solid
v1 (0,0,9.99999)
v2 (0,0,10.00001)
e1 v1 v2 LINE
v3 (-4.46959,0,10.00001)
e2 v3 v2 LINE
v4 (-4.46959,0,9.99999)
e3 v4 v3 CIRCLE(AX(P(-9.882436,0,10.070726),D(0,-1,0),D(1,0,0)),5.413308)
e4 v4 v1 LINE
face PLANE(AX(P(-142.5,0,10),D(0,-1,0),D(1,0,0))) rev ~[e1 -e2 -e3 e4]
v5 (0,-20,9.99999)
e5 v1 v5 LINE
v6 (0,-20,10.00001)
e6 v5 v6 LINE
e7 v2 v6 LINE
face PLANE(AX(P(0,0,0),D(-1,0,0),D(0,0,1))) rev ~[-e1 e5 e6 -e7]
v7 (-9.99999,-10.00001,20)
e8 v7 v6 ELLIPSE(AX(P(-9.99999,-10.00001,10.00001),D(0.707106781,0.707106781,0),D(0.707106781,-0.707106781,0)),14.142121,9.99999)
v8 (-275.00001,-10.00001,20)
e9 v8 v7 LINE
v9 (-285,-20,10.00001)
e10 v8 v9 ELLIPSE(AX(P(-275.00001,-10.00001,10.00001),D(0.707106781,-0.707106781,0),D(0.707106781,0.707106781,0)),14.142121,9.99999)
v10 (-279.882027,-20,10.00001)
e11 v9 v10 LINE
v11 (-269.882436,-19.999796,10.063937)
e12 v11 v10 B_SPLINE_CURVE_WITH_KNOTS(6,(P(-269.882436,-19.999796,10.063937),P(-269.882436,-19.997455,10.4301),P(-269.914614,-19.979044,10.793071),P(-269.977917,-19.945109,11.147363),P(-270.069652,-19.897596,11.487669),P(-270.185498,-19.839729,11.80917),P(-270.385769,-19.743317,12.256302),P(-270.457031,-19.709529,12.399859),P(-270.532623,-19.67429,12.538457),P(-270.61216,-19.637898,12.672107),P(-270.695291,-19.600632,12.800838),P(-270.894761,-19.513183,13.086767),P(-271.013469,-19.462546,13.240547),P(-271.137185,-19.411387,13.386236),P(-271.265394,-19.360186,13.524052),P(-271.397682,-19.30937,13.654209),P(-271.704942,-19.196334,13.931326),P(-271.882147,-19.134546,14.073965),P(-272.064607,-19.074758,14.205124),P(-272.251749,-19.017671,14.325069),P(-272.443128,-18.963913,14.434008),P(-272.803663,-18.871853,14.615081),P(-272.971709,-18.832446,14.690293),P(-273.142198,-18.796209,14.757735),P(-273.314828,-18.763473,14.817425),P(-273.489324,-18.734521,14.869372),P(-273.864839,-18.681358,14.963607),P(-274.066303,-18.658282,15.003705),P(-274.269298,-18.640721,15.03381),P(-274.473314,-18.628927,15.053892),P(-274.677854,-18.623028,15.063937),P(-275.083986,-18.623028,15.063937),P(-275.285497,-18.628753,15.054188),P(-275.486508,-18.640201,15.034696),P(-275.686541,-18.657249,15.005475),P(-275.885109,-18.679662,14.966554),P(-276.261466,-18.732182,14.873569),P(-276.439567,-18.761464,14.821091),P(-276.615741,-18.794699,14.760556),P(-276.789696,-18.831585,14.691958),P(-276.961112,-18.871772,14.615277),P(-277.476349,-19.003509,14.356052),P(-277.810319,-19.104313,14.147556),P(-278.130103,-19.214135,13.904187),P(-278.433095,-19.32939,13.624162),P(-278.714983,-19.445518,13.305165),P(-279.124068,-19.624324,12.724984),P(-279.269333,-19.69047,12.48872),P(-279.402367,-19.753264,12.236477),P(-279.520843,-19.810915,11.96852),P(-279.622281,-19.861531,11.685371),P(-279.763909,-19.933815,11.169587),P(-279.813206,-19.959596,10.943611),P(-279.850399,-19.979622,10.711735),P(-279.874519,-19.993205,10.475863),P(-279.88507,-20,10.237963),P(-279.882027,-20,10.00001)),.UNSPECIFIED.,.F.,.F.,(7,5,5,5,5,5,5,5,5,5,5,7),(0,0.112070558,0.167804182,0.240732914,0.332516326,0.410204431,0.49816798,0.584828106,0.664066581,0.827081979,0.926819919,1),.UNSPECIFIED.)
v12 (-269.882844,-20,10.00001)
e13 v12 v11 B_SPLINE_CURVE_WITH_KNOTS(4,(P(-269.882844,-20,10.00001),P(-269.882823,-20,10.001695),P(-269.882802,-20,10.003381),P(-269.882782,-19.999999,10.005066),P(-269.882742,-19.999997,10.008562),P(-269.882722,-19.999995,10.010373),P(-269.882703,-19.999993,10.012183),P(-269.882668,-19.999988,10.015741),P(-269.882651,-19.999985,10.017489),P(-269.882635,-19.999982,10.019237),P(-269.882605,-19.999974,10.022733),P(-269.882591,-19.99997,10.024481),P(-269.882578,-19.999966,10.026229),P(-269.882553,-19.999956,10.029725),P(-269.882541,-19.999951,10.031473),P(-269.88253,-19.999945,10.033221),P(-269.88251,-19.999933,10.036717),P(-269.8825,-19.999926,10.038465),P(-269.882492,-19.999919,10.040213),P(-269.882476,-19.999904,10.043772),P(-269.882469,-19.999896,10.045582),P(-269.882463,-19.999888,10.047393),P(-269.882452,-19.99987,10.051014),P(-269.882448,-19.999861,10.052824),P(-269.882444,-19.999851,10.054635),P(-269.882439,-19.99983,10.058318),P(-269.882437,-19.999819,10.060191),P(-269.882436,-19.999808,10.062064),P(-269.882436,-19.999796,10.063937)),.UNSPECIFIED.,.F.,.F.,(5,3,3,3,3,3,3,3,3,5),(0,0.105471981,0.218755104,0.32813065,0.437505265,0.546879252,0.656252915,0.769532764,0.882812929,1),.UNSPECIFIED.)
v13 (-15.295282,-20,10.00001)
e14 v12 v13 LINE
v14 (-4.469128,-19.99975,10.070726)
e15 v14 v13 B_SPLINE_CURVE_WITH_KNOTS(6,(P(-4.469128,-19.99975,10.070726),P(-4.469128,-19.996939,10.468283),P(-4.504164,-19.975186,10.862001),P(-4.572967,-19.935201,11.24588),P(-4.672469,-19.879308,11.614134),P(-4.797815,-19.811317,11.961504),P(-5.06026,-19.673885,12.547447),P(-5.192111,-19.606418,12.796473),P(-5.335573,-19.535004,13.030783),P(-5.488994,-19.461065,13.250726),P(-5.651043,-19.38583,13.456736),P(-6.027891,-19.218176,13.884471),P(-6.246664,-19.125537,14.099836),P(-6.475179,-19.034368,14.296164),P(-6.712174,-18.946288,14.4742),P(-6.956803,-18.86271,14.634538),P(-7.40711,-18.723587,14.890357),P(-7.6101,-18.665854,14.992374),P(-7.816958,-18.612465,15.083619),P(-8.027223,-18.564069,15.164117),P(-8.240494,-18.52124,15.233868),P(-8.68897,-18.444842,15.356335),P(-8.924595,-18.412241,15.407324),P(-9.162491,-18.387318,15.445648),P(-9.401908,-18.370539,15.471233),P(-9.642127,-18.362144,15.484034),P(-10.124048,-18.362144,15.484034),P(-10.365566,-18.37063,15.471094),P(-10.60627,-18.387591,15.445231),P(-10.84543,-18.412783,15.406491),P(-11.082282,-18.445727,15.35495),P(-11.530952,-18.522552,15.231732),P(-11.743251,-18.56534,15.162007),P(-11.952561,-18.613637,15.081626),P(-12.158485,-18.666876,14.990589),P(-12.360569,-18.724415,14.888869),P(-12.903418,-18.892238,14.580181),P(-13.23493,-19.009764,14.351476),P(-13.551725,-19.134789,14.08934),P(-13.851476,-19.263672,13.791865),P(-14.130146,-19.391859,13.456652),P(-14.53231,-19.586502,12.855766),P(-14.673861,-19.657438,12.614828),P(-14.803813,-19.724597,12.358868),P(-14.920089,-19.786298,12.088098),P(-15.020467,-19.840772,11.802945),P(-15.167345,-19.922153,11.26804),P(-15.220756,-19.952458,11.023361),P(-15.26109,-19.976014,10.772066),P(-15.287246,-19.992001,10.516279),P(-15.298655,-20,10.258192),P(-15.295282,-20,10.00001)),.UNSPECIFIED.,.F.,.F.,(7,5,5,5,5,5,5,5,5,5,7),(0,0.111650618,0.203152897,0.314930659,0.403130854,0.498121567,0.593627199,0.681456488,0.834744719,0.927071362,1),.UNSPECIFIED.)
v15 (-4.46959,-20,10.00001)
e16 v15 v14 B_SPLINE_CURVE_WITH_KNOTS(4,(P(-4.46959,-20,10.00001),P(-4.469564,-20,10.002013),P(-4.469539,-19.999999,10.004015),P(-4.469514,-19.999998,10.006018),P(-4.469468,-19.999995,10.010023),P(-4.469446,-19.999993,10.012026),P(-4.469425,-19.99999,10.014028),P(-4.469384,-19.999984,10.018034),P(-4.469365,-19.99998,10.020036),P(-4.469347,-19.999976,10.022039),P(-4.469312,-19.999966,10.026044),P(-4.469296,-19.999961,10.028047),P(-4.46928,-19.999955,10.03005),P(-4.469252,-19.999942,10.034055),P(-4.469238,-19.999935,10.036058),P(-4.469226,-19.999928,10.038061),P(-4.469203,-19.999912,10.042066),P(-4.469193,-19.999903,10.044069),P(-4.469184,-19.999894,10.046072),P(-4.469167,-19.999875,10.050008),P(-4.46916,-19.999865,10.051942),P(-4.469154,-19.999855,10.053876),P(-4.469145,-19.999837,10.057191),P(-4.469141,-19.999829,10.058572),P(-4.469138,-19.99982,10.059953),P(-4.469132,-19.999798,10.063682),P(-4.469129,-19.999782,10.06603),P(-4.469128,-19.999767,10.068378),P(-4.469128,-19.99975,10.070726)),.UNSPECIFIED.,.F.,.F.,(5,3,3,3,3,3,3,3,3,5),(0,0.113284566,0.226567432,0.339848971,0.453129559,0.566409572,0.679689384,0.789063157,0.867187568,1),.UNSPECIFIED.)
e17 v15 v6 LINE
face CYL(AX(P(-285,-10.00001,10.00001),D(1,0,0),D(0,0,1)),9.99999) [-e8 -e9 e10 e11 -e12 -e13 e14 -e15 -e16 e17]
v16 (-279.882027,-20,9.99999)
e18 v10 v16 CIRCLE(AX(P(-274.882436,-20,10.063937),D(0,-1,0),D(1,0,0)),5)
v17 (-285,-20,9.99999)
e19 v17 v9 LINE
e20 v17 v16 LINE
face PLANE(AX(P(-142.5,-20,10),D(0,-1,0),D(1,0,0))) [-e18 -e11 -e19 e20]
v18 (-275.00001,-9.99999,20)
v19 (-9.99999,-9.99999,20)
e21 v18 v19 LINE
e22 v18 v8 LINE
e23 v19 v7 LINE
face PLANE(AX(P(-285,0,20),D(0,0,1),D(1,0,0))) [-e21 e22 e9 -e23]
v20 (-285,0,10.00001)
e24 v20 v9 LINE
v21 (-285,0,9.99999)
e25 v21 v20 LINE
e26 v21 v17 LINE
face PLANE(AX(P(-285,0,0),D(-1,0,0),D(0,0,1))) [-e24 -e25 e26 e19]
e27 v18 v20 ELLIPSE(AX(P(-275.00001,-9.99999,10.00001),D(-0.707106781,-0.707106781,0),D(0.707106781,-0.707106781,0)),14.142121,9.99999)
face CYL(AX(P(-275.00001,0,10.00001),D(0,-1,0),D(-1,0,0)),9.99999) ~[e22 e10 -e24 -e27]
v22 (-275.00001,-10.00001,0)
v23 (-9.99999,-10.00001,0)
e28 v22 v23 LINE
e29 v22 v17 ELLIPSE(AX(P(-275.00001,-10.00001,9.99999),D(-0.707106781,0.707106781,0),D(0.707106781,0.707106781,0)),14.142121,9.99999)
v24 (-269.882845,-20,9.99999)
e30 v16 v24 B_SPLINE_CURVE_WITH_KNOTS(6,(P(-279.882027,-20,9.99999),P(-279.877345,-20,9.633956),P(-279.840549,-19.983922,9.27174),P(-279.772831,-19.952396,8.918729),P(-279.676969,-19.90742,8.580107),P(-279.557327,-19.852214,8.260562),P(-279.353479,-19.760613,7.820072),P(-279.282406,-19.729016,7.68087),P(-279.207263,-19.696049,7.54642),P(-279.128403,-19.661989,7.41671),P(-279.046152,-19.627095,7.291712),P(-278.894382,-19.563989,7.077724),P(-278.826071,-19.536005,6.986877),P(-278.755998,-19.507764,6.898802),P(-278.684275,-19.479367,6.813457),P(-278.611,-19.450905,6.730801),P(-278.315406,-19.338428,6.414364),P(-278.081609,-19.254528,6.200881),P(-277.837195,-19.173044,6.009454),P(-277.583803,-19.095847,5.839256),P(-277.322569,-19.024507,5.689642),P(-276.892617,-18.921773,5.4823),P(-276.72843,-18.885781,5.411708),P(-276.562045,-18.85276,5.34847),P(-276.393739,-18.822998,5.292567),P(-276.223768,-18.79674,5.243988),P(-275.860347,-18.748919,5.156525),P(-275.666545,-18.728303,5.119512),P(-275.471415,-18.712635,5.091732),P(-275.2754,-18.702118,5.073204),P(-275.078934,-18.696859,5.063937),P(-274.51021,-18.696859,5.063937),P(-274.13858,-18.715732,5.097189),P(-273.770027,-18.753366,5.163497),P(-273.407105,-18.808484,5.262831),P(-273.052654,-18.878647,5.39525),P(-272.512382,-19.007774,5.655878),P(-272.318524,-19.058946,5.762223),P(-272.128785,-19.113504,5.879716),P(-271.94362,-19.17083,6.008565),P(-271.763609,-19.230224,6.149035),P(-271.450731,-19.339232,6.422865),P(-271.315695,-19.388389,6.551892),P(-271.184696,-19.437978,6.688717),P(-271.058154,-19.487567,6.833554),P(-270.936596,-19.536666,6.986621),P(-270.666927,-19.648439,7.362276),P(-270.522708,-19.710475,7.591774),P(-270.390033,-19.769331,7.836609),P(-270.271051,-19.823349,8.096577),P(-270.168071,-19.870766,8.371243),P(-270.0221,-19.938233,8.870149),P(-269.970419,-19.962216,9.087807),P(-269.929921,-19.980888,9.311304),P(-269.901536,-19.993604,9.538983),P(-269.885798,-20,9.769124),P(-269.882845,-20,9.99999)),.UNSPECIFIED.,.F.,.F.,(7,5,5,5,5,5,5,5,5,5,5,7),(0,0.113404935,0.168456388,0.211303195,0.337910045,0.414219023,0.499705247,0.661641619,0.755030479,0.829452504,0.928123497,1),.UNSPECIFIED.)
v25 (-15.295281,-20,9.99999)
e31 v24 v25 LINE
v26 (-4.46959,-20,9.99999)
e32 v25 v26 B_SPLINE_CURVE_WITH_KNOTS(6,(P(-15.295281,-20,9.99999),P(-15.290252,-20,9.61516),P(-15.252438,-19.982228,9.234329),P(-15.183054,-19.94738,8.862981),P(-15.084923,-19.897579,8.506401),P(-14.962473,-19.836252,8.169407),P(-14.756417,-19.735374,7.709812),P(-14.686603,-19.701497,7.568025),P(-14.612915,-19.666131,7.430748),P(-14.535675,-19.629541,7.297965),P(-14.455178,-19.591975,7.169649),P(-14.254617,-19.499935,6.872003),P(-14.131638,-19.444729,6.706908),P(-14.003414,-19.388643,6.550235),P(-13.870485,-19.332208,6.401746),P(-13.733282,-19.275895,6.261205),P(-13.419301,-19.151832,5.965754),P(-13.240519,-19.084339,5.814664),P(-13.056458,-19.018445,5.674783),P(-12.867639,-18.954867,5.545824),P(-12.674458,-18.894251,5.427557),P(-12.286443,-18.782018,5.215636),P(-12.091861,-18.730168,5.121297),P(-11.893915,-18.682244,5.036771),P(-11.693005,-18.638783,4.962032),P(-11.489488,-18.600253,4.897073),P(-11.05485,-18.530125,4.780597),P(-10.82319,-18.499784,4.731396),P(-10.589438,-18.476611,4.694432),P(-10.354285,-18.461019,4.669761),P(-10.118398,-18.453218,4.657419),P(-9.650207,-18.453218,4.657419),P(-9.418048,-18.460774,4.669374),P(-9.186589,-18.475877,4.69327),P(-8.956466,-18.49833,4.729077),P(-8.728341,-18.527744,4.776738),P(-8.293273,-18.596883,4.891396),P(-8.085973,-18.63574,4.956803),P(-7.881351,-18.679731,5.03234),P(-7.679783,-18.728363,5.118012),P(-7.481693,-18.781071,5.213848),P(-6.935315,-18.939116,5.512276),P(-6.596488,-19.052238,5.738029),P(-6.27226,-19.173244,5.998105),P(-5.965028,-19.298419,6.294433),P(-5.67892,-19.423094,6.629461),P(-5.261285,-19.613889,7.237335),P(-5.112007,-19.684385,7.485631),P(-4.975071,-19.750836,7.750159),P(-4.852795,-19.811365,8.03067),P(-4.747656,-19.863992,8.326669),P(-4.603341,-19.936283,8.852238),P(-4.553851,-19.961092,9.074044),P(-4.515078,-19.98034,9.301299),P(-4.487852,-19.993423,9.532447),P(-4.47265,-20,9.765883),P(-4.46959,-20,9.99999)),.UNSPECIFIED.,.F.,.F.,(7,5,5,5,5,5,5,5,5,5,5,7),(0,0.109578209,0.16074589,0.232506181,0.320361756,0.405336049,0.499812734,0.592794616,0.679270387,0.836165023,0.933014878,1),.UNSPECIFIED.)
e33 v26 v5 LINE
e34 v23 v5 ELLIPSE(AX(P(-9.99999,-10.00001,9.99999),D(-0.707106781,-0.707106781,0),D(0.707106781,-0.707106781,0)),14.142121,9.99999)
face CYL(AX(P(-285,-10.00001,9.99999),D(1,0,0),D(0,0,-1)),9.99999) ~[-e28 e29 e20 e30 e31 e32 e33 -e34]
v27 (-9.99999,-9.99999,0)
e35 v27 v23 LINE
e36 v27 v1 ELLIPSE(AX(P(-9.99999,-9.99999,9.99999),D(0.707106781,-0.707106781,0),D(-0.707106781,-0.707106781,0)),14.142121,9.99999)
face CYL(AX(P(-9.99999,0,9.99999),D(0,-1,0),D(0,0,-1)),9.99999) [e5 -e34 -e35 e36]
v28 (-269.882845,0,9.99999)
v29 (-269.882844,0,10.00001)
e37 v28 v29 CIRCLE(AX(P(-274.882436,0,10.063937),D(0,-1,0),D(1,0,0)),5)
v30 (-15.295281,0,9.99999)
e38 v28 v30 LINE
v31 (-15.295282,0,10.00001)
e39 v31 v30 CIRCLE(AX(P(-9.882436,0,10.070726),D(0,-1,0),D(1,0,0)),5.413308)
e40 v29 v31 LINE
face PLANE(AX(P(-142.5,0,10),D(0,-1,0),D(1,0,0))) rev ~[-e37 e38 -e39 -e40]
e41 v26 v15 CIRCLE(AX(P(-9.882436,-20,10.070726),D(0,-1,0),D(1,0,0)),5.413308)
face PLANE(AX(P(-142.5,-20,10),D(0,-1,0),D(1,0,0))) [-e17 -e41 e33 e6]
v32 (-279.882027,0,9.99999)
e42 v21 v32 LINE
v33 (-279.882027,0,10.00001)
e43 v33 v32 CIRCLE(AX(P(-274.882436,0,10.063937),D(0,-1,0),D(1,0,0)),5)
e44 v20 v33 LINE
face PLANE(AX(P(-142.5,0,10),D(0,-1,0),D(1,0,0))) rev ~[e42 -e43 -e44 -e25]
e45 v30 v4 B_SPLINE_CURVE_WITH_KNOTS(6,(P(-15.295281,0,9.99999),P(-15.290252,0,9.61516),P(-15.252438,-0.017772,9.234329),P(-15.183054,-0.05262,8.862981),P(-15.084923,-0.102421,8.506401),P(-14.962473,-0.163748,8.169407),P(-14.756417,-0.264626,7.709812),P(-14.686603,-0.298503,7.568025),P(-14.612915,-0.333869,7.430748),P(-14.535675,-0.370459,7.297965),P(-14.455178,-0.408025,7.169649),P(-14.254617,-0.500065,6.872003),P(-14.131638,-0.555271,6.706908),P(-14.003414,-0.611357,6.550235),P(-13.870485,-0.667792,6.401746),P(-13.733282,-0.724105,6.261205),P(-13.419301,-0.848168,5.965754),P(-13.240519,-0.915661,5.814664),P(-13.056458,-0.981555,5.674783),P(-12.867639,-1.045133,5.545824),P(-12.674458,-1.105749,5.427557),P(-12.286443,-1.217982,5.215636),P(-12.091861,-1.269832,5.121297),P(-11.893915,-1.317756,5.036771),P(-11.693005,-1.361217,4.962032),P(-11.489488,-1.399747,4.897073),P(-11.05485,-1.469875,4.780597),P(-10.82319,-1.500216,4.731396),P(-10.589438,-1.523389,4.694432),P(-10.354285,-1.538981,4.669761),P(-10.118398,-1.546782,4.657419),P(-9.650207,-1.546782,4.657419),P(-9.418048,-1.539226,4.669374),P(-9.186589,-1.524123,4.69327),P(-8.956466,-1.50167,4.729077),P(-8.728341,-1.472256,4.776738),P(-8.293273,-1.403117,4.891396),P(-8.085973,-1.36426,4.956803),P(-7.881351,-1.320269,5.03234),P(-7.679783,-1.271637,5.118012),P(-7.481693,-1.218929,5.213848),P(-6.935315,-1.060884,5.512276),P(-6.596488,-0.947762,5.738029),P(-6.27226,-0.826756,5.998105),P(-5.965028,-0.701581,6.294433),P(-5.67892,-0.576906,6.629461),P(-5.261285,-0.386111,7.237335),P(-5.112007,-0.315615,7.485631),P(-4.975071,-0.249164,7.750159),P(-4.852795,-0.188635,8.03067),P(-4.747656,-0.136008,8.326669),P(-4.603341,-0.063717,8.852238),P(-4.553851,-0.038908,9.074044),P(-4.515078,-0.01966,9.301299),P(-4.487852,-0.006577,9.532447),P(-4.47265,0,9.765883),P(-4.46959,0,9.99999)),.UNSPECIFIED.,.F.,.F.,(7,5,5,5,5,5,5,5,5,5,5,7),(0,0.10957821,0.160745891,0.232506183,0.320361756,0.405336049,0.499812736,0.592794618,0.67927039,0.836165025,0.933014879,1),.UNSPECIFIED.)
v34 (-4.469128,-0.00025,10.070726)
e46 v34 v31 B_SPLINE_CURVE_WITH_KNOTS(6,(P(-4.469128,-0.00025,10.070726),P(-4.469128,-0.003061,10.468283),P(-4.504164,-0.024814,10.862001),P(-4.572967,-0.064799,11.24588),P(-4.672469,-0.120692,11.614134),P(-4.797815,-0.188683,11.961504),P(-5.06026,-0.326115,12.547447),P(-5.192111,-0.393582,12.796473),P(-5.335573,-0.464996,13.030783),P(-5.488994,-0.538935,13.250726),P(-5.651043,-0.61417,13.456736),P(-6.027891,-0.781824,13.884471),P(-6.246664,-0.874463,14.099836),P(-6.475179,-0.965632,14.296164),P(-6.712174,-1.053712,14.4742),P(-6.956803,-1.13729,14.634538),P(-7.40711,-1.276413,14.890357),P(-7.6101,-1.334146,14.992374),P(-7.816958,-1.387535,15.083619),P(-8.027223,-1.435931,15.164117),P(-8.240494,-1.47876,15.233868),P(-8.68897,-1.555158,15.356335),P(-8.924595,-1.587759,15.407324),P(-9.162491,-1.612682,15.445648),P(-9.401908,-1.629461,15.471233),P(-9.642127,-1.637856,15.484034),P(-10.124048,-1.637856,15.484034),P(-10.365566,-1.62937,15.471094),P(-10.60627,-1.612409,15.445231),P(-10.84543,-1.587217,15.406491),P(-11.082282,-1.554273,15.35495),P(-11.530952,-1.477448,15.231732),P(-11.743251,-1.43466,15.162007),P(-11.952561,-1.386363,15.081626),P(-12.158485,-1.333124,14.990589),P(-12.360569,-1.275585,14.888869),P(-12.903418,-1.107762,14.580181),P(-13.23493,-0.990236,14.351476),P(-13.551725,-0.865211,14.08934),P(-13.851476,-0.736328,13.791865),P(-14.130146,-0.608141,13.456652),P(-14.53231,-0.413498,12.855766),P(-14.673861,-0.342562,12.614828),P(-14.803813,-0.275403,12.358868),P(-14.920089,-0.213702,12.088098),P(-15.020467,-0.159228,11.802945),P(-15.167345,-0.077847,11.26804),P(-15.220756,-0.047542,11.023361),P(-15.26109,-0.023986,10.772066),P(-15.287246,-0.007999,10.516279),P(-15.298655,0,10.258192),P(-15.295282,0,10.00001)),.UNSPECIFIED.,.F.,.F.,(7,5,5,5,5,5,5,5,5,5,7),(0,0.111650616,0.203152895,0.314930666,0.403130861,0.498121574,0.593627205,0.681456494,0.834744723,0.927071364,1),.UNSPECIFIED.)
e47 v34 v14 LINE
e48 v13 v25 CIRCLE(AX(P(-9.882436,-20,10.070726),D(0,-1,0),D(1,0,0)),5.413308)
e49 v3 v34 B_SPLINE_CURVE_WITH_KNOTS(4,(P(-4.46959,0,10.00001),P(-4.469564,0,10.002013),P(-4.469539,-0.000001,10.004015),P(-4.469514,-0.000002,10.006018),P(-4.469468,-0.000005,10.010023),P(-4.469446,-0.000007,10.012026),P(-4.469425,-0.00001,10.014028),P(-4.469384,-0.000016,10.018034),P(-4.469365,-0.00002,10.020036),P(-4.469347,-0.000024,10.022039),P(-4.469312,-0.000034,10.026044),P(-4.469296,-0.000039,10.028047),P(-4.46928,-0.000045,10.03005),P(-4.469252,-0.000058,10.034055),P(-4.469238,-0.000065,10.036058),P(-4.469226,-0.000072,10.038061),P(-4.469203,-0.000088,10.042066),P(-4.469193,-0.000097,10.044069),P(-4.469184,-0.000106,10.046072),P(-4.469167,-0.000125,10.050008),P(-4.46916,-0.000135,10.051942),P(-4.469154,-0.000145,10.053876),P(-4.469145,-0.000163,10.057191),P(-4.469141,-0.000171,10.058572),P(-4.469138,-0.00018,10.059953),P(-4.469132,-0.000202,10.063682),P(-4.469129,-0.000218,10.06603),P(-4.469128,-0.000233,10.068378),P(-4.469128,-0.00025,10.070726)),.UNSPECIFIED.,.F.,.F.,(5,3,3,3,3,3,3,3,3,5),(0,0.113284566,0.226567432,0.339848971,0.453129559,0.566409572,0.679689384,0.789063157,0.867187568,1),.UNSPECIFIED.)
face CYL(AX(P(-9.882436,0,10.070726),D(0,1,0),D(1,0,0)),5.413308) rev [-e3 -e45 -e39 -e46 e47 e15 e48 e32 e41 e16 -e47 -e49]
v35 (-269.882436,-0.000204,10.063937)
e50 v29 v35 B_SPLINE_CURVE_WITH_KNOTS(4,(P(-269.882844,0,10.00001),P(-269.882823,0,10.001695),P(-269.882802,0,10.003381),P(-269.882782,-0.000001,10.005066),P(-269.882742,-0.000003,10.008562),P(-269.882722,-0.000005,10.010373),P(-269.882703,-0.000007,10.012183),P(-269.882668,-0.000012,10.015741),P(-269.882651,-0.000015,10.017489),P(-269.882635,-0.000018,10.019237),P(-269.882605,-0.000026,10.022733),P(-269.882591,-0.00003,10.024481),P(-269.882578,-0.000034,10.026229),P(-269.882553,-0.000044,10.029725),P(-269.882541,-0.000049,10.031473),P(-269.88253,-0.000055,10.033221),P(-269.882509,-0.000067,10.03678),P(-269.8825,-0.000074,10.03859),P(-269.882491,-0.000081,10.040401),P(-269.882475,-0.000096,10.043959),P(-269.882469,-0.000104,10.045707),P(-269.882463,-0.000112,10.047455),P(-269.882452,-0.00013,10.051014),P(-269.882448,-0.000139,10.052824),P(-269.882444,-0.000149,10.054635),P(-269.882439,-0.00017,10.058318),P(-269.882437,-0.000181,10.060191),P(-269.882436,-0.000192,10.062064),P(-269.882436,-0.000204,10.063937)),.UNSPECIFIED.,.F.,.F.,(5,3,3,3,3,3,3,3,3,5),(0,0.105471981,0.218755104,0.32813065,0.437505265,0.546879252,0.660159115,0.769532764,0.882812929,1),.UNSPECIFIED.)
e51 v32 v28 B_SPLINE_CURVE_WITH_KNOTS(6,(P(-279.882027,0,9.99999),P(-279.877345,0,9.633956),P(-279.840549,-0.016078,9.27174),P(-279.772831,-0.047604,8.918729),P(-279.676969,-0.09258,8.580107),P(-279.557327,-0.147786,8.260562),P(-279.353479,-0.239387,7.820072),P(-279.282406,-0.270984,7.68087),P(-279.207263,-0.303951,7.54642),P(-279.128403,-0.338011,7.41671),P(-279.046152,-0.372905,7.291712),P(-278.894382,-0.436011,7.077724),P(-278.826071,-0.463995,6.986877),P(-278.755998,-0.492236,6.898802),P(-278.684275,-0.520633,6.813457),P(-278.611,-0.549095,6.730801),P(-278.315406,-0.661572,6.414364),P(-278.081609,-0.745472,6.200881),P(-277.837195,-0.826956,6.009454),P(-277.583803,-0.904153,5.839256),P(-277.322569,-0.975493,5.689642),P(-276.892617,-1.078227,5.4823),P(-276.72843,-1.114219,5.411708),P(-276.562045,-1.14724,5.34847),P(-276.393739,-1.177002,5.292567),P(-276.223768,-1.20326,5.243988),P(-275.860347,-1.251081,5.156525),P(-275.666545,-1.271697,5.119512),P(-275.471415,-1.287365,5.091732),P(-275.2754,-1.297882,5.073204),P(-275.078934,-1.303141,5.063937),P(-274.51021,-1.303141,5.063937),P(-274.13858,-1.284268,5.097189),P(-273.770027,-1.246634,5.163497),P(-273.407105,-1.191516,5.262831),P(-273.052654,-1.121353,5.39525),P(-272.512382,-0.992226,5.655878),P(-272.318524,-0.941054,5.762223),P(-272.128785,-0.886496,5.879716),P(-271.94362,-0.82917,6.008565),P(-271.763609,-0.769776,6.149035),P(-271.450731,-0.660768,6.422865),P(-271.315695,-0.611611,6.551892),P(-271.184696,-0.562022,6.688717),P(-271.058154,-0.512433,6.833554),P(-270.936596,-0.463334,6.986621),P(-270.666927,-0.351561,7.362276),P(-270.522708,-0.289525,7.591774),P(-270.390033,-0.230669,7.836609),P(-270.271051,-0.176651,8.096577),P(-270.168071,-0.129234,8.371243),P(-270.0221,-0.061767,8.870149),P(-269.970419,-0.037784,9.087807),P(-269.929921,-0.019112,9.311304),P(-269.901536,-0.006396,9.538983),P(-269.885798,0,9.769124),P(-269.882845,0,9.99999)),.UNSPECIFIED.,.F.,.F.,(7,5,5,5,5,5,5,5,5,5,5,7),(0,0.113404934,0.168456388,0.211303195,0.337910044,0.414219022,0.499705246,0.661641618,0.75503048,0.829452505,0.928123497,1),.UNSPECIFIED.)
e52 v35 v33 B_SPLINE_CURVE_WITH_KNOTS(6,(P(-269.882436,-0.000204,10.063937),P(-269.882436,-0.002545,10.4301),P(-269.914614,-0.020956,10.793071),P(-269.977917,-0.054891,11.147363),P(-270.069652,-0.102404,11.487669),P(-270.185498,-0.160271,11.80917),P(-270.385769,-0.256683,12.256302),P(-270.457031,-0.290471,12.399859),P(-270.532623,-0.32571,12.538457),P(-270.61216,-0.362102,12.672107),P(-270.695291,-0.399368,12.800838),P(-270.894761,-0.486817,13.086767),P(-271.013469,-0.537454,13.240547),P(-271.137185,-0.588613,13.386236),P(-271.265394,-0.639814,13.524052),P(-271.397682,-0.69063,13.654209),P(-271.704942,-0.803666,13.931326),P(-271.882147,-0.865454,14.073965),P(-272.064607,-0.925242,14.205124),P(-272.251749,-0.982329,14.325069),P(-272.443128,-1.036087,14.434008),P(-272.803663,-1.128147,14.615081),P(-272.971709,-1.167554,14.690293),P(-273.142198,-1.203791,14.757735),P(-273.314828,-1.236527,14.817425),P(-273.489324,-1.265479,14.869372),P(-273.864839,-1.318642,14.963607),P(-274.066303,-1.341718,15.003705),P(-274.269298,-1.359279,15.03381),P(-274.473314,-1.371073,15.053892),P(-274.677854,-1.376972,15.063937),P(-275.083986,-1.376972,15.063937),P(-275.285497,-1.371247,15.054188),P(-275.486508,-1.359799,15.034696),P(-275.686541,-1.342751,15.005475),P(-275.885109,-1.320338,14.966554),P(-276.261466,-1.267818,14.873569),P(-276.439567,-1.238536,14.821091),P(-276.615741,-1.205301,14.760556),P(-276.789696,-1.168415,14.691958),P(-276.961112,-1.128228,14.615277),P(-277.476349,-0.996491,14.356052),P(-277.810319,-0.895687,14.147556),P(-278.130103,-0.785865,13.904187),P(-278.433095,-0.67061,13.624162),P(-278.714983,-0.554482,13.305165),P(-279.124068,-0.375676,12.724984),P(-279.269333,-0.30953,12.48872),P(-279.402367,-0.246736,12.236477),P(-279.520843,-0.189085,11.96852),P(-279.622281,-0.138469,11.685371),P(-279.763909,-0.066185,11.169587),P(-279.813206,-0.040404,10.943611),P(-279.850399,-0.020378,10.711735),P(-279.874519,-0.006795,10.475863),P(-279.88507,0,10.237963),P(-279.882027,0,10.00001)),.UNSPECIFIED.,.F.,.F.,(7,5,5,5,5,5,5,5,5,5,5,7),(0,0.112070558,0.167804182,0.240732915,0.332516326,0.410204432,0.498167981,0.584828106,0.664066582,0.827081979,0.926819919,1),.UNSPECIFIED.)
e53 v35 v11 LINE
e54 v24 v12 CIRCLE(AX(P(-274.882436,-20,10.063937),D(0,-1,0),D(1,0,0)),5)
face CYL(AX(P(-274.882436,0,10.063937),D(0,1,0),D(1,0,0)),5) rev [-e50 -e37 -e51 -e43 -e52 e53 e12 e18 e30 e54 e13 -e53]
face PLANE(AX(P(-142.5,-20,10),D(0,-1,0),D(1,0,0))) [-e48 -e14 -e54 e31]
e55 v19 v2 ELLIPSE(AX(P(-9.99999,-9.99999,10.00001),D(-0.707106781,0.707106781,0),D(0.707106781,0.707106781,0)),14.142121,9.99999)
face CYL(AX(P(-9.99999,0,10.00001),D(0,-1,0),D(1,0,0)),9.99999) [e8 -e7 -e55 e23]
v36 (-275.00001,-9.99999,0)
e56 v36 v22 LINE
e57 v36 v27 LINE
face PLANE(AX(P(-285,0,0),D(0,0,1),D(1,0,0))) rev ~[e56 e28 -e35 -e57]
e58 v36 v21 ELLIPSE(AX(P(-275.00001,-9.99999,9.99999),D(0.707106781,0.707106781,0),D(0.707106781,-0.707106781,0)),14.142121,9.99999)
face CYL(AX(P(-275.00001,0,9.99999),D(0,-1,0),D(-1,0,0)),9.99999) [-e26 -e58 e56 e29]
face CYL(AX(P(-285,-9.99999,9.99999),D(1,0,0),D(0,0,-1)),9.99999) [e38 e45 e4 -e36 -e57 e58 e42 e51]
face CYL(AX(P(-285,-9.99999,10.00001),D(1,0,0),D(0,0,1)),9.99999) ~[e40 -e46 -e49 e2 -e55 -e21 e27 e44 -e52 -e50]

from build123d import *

# Parameters (mm, degrees)
F0_W     = 285
F0_H     = 20
F1_DEPTH = 20
F2_R     = 9.99999
F3_R     = 5
F3_R_2   = 5.4133078472
F4_DEPTH = 20


# Not quite as in the source:
# - a fillet or chamfer is up to 0.001 mm smaller than in the source, because OpenCascade refuses the exact size


with BuildPart() as f1:
    # F0 (on Front) → F1 (new body)
    with BuildSketch(Plane.XZ):
        with Locations((-142.5, 10)):
            Rectangle(F0_W, F0_H)
    extrude(amount=F1_DEPTH)

    # F2 (radius 10 in the source; OpenCascade refuses exactly that, so slightly less here)
    f2_edges = [f1.edges().sort_by_distance(p)[0] for p in [
        (-142.5, -20, 20),
        (-142.5, 0, 20),
        (-142.5, -20, 0),
        (0, -10, 0),
        (-142.5, 0, 0),
        (-285, -10, 0),
        (0, -10, 20),
        (-285, -10, 20),
    ]]
    fillet(f2_edges, radius=F2_R)

    # F3 (on Front) → F4 (cut)
    with BuildSketch(Plane.XZ):
        with Locations((-274.8824357986, 10.0639369339)):
            Circle(F3_R)
        with Locations((-9.8824357986, 10.070726499)):
            Circle(F3_R_2)
    extrude(amount=F4_DEPTH, mode=Mode.SUBTRACT)


solid = f1.part
